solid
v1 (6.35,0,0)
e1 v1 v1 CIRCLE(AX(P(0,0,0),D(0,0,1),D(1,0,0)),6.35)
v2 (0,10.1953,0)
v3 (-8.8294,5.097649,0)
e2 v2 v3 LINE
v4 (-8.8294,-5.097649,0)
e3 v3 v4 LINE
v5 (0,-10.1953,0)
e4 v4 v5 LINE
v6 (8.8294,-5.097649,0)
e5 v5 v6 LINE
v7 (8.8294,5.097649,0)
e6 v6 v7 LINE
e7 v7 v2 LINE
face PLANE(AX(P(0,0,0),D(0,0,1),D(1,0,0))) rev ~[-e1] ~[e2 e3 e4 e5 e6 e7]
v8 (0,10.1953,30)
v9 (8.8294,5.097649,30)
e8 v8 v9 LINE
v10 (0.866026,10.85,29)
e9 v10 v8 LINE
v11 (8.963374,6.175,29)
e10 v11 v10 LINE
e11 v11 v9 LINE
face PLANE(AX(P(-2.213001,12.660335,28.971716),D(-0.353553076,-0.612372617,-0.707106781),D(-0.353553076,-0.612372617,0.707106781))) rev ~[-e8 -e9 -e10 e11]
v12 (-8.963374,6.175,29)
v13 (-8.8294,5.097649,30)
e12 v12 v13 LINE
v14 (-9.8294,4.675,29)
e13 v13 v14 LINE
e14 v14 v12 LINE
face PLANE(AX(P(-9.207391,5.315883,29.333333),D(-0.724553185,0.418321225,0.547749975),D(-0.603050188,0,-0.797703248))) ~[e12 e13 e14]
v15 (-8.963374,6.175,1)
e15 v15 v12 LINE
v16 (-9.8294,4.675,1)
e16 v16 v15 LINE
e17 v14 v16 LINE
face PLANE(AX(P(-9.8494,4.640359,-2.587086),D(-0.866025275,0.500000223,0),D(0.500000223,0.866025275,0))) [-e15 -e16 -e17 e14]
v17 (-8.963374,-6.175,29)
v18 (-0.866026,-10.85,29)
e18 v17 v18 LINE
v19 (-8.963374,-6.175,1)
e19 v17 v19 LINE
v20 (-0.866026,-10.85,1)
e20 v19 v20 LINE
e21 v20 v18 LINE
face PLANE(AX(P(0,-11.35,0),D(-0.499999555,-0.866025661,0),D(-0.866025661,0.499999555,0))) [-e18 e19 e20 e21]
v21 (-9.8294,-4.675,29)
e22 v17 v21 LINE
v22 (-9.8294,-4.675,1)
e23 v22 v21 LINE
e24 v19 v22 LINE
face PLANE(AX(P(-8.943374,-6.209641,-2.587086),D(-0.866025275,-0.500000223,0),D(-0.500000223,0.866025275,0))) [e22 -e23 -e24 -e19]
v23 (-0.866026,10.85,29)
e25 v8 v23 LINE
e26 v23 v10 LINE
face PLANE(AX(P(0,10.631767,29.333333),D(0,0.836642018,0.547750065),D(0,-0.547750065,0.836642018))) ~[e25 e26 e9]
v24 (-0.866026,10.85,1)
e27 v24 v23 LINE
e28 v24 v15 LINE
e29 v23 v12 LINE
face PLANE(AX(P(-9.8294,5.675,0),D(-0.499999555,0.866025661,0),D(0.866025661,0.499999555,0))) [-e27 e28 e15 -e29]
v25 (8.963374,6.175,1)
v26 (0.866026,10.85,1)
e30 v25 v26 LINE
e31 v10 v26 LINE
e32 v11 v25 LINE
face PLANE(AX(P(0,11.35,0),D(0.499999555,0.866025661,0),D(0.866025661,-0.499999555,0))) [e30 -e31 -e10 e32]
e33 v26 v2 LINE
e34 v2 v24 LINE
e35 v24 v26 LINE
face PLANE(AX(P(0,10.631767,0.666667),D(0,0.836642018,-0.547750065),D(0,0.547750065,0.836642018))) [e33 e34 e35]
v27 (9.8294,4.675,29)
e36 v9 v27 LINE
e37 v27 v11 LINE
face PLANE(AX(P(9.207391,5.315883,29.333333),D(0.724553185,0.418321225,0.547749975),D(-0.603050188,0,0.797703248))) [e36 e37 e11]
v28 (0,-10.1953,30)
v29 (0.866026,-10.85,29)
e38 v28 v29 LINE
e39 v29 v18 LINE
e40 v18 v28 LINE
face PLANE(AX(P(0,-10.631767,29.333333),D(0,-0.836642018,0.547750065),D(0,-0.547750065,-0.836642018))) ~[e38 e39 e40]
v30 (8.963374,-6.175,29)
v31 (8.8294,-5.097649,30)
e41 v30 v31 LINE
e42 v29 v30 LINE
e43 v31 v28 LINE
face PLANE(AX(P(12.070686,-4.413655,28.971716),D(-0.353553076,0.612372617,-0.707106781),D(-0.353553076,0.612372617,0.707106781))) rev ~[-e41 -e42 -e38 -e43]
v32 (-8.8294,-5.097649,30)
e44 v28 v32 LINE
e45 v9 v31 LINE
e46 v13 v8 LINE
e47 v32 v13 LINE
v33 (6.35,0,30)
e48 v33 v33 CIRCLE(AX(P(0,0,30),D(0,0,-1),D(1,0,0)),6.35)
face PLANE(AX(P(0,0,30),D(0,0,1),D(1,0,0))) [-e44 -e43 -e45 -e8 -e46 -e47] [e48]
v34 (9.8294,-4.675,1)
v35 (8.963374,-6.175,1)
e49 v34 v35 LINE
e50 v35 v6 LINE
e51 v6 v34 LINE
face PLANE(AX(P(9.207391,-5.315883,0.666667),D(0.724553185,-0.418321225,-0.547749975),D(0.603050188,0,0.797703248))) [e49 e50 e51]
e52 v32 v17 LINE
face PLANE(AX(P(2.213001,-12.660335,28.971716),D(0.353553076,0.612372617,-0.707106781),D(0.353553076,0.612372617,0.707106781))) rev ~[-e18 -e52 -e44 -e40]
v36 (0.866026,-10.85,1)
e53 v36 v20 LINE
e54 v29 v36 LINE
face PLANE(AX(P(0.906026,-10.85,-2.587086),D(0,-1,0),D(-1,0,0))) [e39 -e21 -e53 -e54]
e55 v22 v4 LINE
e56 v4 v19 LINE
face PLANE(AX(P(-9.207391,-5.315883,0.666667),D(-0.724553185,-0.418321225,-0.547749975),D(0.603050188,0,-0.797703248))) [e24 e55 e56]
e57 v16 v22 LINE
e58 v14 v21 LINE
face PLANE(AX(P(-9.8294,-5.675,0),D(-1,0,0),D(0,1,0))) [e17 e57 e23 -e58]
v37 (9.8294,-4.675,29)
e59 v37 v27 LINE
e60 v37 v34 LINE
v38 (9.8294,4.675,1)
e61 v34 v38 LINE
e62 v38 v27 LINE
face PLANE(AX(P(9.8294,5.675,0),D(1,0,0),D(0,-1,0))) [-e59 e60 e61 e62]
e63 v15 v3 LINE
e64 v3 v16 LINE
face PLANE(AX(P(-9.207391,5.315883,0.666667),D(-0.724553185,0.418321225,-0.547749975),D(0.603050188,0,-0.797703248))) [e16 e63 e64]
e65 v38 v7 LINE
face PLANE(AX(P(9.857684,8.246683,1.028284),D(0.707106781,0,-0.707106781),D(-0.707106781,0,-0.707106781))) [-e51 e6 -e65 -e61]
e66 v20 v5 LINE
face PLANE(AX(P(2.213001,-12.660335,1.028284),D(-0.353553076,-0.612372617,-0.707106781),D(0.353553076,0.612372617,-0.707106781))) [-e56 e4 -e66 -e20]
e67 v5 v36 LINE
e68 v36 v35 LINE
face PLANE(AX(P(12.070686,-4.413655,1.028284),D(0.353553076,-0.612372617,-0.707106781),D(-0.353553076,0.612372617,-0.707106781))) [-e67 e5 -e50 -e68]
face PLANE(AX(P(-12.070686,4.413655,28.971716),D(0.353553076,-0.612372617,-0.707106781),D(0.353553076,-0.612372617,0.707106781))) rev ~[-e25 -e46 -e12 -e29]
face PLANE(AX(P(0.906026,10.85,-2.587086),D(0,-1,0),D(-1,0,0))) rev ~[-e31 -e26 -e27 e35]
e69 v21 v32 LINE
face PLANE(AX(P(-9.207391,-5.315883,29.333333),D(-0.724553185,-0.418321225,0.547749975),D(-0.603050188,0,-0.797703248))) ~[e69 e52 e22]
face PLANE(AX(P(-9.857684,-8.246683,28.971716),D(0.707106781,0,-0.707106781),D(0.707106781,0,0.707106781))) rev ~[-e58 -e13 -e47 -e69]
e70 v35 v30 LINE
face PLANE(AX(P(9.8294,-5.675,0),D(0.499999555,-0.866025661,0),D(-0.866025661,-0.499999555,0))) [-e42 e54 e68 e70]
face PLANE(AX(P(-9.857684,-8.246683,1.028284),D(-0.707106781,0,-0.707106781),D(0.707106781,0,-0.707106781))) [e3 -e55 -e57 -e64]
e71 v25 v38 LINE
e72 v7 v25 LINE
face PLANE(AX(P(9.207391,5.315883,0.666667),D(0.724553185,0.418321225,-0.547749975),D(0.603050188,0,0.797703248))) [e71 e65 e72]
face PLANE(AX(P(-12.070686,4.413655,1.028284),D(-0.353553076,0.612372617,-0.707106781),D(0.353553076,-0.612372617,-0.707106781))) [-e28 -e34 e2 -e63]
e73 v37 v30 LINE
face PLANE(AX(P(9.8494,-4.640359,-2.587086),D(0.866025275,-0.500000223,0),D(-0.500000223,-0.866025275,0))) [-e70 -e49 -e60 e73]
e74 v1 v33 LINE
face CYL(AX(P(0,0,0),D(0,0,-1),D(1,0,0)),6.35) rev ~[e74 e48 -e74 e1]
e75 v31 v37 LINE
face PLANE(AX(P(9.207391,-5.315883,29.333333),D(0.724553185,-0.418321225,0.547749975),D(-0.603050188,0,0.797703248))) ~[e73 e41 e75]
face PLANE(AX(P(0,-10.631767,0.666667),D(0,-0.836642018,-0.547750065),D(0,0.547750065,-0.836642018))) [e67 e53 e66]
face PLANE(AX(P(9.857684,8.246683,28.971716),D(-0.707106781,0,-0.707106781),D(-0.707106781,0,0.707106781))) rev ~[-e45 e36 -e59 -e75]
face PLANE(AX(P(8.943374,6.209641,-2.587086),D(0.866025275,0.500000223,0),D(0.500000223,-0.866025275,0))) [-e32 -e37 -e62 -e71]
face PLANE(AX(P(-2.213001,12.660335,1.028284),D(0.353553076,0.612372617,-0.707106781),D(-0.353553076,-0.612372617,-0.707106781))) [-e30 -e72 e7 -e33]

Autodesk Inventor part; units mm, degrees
ref_plane "YZ Plane" through (0, 0, 0) normal (1, 0, 0) x (0, 1, 0)
ref_plane "XZ Plane" through (0, 0, 0) normal (0, 1, 0) x (-1, 0, 0)
ref_plane "XY Plane" through (0, 0, 0) normal (0, 0, 1) x (1, 0, 0)
sketch "Sketch2" plane through (0, 0, 0) normal (0, 0, 1) x (1, 0, 0)
  circle A0 centre (0, 0) radius 6.35
  line L0 (0, 0) -> (0, 11.35)
  line L1 (0, 11.35) -> (9.8294, 5.675)
  line L2 (9.8294, 5.675) -> (9.8294, -5.675)
  line L3 (9.8294, -5.675) -> (0, -11.35)
  line L4 (0, -11.35) -> (-9.8294, -5.675)
  line L5 (-9.8294, -5.675) -> (-9.8294, 5.675)
  line L6 (-9.8294, 5.675) -> (0, 11.35)
  dimension "d11" = 12.7
extrude "Extrusion2" add sketch "Sketch2" along normal blind 30
thread "Thread2" size "1/2-20 UNF" class "2B" standard "ANSI Unified Screw Threads" full length
chamfer "Chamfer2" distance 1 angle 45 18 edges at (4.9147, 8.5125, 30) (9.8294, 0, 30) (4.9147, -8.5125, 30) (-4.9147, -8.5125, 30) (-9.8294, 0, 30) (-4.9147, 8.5125, 30) (9.8294, 5.675, 15) (9.8294, -5.675, 15) (0, -11.35, 15) (-9.8294, -5.675, 15) (-9.8294, 5.675, 15) (0, 11.35, 15) (-4.9147, 8.5125, 0) (4.9147, 8.5125, 0) (9.8294, 0, 0) (4.9147, -8.5125, 0) (-4.9147, -8.5125, 0) (-9.8294, 0, 0)
properties part number "5302_Brass_Nut_0.5_20_Tx_Rx_Relative_Positioning_MPSv2_v1" material "Brass, Soft Yellow"
